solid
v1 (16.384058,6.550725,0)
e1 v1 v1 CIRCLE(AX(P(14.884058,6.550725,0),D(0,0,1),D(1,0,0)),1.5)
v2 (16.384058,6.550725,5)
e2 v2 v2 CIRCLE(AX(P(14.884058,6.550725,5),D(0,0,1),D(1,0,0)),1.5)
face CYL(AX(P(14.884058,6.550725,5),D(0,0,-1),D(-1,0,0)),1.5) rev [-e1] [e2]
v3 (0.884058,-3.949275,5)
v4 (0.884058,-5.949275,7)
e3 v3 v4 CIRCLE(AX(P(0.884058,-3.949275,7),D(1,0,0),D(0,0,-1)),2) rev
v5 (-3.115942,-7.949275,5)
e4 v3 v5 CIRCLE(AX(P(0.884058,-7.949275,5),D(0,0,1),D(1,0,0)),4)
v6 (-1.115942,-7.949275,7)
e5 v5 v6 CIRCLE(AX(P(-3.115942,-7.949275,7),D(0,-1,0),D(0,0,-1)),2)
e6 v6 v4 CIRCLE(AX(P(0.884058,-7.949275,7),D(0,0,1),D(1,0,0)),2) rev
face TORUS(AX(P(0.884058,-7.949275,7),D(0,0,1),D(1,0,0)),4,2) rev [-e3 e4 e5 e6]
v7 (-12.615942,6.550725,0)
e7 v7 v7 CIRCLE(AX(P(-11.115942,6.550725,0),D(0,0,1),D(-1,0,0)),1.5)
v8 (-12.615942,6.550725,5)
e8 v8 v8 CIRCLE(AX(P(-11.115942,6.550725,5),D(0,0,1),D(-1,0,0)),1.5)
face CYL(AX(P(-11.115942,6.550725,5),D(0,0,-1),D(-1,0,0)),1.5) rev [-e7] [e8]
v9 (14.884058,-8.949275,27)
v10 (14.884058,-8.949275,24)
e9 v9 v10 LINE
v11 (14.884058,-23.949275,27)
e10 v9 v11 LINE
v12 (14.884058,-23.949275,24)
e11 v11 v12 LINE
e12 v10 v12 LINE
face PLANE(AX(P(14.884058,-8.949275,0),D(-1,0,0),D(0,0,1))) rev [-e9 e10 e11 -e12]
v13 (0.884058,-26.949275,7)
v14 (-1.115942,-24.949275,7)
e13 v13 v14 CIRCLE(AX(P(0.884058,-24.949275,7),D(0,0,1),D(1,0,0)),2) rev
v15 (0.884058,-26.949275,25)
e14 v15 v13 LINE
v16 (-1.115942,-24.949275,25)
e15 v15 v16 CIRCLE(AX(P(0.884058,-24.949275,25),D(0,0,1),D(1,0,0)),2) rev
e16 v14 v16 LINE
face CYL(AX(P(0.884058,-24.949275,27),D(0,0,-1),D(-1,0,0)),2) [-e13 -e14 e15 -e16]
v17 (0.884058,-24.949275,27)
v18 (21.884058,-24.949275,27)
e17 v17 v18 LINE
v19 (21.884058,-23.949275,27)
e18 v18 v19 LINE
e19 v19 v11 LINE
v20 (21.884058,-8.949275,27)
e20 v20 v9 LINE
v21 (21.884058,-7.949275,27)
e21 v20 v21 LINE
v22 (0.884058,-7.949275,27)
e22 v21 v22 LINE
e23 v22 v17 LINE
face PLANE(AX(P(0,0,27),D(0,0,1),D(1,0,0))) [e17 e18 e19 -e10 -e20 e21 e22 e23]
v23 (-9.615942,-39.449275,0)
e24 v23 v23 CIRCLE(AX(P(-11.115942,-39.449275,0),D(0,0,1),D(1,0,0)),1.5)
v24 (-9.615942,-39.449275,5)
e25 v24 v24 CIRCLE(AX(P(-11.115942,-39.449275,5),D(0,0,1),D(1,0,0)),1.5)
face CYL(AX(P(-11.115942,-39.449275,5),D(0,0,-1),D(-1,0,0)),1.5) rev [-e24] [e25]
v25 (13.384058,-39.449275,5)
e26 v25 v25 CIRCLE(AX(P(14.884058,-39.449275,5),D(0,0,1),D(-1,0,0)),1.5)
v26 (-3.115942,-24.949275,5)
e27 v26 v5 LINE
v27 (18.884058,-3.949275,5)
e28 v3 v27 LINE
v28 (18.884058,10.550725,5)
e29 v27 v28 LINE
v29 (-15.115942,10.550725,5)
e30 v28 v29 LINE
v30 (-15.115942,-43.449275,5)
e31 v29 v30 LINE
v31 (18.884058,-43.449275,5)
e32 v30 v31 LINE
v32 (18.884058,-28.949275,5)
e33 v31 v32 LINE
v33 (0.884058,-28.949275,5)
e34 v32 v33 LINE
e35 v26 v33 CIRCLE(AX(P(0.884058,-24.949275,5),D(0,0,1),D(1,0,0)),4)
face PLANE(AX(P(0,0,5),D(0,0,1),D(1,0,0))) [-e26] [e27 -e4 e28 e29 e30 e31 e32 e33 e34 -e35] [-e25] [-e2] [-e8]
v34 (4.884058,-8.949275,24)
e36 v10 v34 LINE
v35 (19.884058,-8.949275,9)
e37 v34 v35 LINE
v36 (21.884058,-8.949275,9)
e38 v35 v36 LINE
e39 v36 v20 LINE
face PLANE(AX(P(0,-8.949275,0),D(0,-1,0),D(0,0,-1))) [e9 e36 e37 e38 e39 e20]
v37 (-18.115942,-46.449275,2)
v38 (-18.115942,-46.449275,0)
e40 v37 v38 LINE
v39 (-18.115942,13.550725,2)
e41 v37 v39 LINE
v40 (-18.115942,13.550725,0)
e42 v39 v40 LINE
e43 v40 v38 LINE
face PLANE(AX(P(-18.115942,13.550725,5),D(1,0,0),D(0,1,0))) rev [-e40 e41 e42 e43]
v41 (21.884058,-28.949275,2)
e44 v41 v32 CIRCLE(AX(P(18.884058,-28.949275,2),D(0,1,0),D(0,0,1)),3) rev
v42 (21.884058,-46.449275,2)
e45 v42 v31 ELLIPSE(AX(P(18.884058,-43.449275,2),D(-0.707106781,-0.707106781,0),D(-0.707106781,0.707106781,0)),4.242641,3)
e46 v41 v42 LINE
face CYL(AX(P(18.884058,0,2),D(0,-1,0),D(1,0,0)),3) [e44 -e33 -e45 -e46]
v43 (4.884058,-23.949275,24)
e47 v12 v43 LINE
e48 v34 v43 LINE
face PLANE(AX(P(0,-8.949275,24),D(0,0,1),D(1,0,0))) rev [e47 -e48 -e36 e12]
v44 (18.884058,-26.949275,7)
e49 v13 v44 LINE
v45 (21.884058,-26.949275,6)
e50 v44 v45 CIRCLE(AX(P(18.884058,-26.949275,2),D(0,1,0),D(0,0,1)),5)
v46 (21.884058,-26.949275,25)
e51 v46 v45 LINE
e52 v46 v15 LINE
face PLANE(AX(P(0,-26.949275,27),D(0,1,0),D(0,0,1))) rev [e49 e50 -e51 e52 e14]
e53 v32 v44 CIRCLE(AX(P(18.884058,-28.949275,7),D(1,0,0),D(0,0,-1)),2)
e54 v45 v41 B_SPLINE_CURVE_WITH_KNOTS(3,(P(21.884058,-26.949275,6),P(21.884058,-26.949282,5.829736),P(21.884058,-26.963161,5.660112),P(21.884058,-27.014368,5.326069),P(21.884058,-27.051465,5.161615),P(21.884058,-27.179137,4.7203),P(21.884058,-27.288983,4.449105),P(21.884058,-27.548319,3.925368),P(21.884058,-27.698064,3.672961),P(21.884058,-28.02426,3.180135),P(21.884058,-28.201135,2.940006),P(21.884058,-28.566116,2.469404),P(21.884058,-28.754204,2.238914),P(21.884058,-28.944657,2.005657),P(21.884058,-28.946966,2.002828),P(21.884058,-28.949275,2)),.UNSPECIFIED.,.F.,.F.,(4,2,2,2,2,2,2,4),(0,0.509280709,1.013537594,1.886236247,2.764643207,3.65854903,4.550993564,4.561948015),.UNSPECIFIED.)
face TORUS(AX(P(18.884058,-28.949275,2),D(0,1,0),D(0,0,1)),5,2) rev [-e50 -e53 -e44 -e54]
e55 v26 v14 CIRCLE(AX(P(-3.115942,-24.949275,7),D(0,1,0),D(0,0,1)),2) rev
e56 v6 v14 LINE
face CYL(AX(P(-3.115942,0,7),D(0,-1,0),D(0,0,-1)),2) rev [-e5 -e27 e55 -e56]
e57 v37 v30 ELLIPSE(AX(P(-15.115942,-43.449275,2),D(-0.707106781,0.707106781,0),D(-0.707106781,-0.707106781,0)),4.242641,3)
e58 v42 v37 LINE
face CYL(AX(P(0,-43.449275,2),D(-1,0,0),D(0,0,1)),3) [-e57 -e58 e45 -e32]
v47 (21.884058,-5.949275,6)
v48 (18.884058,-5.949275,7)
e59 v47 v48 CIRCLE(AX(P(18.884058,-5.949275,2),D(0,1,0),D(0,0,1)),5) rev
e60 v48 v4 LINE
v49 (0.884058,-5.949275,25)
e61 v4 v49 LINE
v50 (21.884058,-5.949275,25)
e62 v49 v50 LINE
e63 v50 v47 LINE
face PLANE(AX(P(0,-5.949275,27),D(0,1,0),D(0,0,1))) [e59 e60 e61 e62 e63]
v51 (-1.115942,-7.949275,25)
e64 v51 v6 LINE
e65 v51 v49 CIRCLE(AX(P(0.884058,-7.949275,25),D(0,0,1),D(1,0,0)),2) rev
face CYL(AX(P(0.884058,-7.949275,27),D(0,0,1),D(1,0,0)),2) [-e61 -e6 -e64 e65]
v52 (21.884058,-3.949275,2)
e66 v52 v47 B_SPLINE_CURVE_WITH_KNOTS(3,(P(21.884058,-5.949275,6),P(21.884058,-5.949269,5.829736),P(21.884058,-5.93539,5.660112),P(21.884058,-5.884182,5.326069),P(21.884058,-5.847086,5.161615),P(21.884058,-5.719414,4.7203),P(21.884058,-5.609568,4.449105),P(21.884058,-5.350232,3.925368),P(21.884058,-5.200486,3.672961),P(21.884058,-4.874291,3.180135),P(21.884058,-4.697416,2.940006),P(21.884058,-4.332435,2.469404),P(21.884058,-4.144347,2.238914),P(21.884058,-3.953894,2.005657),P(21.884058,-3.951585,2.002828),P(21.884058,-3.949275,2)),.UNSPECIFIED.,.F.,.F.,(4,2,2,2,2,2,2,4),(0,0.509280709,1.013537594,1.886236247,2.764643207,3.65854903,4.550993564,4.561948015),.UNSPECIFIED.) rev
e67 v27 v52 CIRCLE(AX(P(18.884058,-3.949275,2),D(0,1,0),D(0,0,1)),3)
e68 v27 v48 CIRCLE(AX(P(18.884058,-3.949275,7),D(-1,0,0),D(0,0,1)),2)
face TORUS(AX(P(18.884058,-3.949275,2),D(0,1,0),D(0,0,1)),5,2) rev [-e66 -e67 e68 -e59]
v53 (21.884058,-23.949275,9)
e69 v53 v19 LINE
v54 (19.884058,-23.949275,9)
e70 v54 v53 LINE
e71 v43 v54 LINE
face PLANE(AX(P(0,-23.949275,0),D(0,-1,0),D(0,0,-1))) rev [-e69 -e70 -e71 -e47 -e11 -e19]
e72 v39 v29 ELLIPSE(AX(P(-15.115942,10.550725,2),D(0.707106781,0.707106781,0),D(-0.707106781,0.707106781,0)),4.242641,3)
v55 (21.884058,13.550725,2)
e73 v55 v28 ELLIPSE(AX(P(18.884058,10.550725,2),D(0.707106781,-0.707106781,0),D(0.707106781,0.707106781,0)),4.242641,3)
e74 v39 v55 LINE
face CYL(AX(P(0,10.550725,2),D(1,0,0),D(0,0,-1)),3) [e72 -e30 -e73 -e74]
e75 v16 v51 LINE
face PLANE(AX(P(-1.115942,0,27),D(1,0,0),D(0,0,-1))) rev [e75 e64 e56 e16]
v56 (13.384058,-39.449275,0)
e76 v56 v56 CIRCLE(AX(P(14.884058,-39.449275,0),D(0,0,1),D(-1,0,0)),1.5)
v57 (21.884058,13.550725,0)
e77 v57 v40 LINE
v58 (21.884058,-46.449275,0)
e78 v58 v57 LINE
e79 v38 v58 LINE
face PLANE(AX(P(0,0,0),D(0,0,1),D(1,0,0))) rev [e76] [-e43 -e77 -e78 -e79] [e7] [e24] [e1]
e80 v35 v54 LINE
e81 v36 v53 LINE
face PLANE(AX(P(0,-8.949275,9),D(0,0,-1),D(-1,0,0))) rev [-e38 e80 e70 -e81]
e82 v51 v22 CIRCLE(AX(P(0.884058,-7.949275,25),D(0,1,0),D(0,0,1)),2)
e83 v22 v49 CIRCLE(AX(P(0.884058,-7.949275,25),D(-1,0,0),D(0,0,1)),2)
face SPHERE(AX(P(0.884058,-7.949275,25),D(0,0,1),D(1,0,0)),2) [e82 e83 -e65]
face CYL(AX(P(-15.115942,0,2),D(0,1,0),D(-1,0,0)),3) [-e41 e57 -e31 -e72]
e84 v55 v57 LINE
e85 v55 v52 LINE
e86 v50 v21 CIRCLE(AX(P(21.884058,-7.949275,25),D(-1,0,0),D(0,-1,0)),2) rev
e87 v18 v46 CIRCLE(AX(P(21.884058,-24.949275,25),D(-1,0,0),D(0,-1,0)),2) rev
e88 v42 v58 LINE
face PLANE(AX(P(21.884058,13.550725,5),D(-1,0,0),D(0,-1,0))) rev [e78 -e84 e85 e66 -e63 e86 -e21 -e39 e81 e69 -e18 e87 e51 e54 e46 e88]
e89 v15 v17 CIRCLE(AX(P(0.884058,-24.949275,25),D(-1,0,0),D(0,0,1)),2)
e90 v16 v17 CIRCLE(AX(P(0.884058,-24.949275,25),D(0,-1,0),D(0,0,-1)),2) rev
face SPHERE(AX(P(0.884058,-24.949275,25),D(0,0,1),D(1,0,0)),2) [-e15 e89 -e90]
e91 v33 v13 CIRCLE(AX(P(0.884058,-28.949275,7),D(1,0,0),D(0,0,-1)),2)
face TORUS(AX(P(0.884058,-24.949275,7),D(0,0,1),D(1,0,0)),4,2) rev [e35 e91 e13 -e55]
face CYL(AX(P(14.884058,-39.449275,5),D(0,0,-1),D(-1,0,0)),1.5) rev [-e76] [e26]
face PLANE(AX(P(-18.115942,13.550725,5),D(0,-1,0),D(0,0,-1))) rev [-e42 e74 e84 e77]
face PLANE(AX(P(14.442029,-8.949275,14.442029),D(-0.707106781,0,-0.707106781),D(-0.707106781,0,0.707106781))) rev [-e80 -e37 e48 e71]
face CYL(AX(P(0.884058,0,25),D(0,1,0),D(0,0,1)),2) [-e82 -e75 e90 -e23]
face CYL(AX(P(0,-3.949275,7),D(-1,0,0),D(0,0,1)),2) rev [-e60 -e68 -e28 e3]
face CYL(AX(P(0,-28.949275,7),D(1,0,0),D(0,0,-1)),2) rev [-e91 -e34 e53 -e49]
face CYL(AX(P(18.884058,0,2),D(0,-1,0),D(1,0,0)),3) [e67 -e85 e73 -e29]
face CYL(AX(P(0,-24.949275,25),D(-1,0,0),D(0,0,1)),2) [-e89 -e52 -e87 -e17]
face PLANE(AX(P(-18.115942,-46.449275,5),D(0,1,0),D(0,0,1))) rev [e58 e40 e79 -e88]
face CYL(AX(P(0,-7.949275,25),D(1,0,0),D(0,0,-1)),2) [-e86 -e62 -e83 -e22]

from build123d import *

# Parameters (mm, degrees)
SKETCH1_W           = 40
SKETCH1_H           = 60
SKETCH1_R           = 1.5
BOSS_EXTRUDE1_DEPTH = 5
SKETCH3_W           = 23
SKETCH3_H           = 21
BOSS_EXTRUDE2_DEPTH = 22
CUT_EXTRUDE1_START  = -3
SKETCH4_W           = 2
SKETCH4_H           = 15
CUT_EXTRUDE1_DEPTH  = 15
FILLET1_R           = 3
FILLET2_R           = 2


with BuildPart() as part:
    # Sketch1 → Boss-Extrude1 (new body)
    with BuildSketch(Plane.XY):
        with Locations((1.884057971, -16.449275362)):
            Rectangle(SKETCH1_W, SKETCH1_H)
        with Locations((14.884057971, 6.550724638)):
            Circle(SKETCH1_R, mode=Mode.SUBTRACT)
        with Locations(Location((14.884057971, -39.449275362, 0), (0, 0, 180))):
            Circle(SKETCH1_R, mode=Mode.SUBTRACT)
        with Locations((-11.115942029, -39.449275362)):
            Circle(SKETCH1_R, mode=Mode.SUBTRACT)
        with Locations(Location((-11.115942029, 6.550724638, 0), (0, 0, 180))):
            Circle(SKETCH1_R, mode=Mode.SUBTRACT)
    extrude(amount=BOSS_EXTRUDE1_DEPTH)

    # Sketch3 → Boss-Extrude2 (add)
    with BuildSketch(Plane.XY.offset(5)):
        with Locations((10.384057971, -16.449275362)):
            Rectangle(SKETCH3_W, SKETCH3_H)
    extrude(amount=BOSS_EXTRUDE2_DEPTH)

    # Sketch4 → Cut-Extrude1 (cut)
    with BuildSketch(Plane.XZ.offset(26.949275362).offset(CUT_EXTRUDE1_START)):
        with Locations((20.884057971, 16.5)):
            Rectangle(SKETCH4_W, SKETCH4_H)
        Polygon((14.884057971, 24), (14.884057971, 14), (19.884057971, 9), (19.884057971, 24), align=None)
        Polygon((14.884057971, 27), (14.884057971, 24), (19.884057971, 24), (21.884057971, 24), (21.884057971, 27), align=None)
        Polygon((14.884057971, 24), (4.884057971, 24), (14.884057971, 14), align=None)
    extrude(amount=-CUT_EXTRUDE1_DEPTH, mode=Mode.SUBTRACT)

    # Fillet1
    fillet1_edges = [part.edges().sort_by_distance(p)[0] for p in [
        (21.884057971, -36.699275362, 5),
        (1.884057971, 13.550724638, 5),
        (21.884057971, 3.800724638, 5),
        (-18.115942029, -16.449275362, 5),
        (1.884057971, -46.449275362, 5),
    ]]
    fillet(fillet1_edges, radius=FILLET1_R)

    # Fillet2
    # the kernel refuses this fillet: 2 mm, written as the material it takes off along each edge
    with BuildSketch(Plane(origin=(0.884057971, -7.949275362, 25), x_dir=(-1, 0, 0), z_dir=(0, 0, 1))) as fillet2_piece_1_section:
        Polygon((0, 0), (FILLET2_R * 1.02, 0), (FILLET2_R * 1.02, -FILLET2_R * 1.02), (0, -FILLET2_R * 1.02), align=None)
    fillet2_piece_1 = extrude(amount=FILLET2_R * 1.02, mode=Mode.PRIVATE)
    fillet2_piece_1 = fillet2_piece_1 - Plane(origin=(0.884057971, -7.949275362, 25), x_dir=(0.7071067811865475, -0.7071067811865475, 0), z_dir=(0, 0, 1)) * Sphere(FILLET2_R, mode=Mode.PRIVATE)
    add(fillet2_piece_1, mode=Mode.SUBTRACT)
    with BuildSketch(Plane(origin=(0.884057971, -24.949275362, 25), x_dir=(-1, 0, 0), z_dir=(0, 0, 1))) as fillet2_piece_2_section:
        Polygon((0, 0), (FILLET2_R * 1.02, 0), (FILLET2_R * 1.02, FILLET2_R * 1.02), (0, FILLET2_R * 1.02), align=None)
    fillet2_piece_2 = extrude(amount=FILLET2_R * 1.02, mode=Mode.PRIVATE)
    fillet2_piece_2 = fillet2_piece_2 - Plane(origin=(0.884057971, -24.949275362, 25), x_dir=(0.7071067811865475, 0.7071067811865475, 0), z_dir=(0, 0, 1)) * Sphere(FILLET2_R, mode=Mode.PRIVATE)
    add(fillet2_piece_2, mode=Mode.SUBTRACT)
    with BuildSketch(Plane(origin=(-1.115942029, -5.949275362, 5), x_dir=(0, -1, 0), z_dir=(0, 0, 1))) as fillet2_piece_3:
        with BuildLine():
            CenterArc((FILLET2_R, FILLET2_R), FILLET2_R, 180, 90)
            Line((0, FILLET2_R), (0, 0))
            Line((0, 0), (FILLET2_R, 0))
        make_face()
    extrude(amount=20, mode=Mode.SUBTRACT)
    with BuildSketch(Plane(origin=(-1.115942029, -26.949275362, 5), x_dir=(0, 1, 0), z_dir=(0, 0, 1))) as fillet2_piece_4:
        with BuildLine():
            CenterArc((FILLET2_R, -FILLET2_R), FILLET2_R, 90, 90)
            Line((0, -FILLET2_R), (0, 0))
            Line((0, 0), (FILLET2_R, 0))
        make_face()
    extrude(amount=20, mode=Mode.SUBTRACT)
    with BuildSketch(Plane(origin=(0.884057971, -5.949275362, 27), x_dir=(0, -1, 0), z_dir=(1, 0, 0))) as fillet2_piece_5:
        with BuildLine():
            CenterArc((FILLET2_R, FILLET2_R), FILLET2_R, 180, 90)
            Line((0, FILLET2_R), (0, 0))
            Line((0, 0), (FILLET2_R, 0))
        make_face()
    extrude(amount=26, mode=Mode.SUBTRACT)
    with BuildSketch(Plane(origin=(-1.115942029, -24.949275362, 27), x_dir=(0, 0, -1), z_dir=(0, 1, 0))) as fillet2_piece_6:
        with BuildLine():
            CenterArc((FILLET2_R, -FILLET2_R), FILLET2_R, 90, 90)
            Line((0, -FILLET2_R), (0, 0))
            Line((0, 0), (FILLET2_R, 0))
        make_face()
    extrude(amount=17, mode=Mode.SUBTRACT)
    with BuildSketch(Plane(origin=(26.884057971, -26.949275362, 27), x_dir=(0, 0, -1), z_dir=(-1, 0, 0))) as fillet2_piece_7:
        with BuildLine():
            CenterArc((FILLET2_R, -FILLET2_R), FILLET2_R, 90, 90)
            Line((0, -FILLET2_R), (0, 0))
            Line((0, 0), (FILLET2_R, 0))
        make_face()
    extrude(amount=26, mode=Mode.SUBTRACT)
    # the kernel refuses this fillet: 2 mm, written as the material it adds along each edge
    with BuildSketch(Plane(origin=(-1.115942029, -24.949275362, 5), x_dir=(-1, 0, 0), z_dir=(0, 1, 0))) as fillet2_2_piece_1:
        with BuildLine():
            CenterArc((FILLET2_R, FILLET2_R), FILLET2_R, 180, 90)
            Line((0, FILLET2_R), (0, 0))
            Line((0, 0), (FILLET2_R, 0))
        make_face()
    extrude(amount=17)
    with BuildSketch(Plane(origin=(18.884057971, -26.949275362, 5), x_dir=(0, -1, 0), z_dir=(-1, 0, 0)), Plane(origin=(0.884057971, -5.949275362, 5), x_dir=(0, 1, 0), z_dir=(1, 0, 0))) as fillet2_2_piece_2:
        with BuildLine():
            CenterArc((FILLET2_R, FILLET2_R), FILLET2_R, 180, 90)
            Line((0, FILLET2_R), (0, 0))
            Line((0, 0), (FILLET2_R, 0))
        make_face()
    extrude(amount=18)
    with BuildSketch(Plane(origin=(18.884057971, -5.949275362, 2), x_dir=(-0.09638996566753259, 0, -0.9953436464450918), z_dir=(-0.9953436464450918, 0, 0.09638996566753259))) as fillet2_2_piece_3_section:
        with BuildLine():
            CenterArc((3 + FILLET2_R, -FILLET2_R), FILLET2_R, 90, 90)
            Line((3 + FILLET2_R, 0), (3, 0))
            Line((3, 0), (3, -FILLET2_R))
        make_face()
    fillet2_2_piece_3 = revolve(axis=Axis((18.884057971, -5.949275362, 2), (0, -1, 0)), revolution_arc=185.531326158, mode=Mode.PRIVATE)
    fillet2_2_piece_3 = split(fillet2_2_piece_3, bisect_by=Plane(origin=(21.104944702, -5.375674968, 0), z_dir=(0, 0, 1)), keep=Keep.TOP, mode=Mode.PRIVATE)
    fillet2_2_piece_3 = split(fillet2_2_piece_3, bisect_by=Plane(origin=(21.884057971, -5.375674968, 4.220886685), z_dir=(-1, 0, 0)), keep=Keep.TOP, mode=Mode.PRIVATE)
    add(fillet2_2_piece_3)
    with BuildSketch(Plane(origin=(18.884057971, -26.949275362, 2), x_dir=(-0.09638996566753259, 0, -0.9953436464450918), z_dir=(-0.9953436464450918, 0, 0.09638996566753259))) as fillet2_2_piece_4_section:
        with BuildLine():
            CenterArc((3 + FILLET2_R, FILLET2_R), FILLET2_R, 180, 90)
            Line((3 + FILLET2_R, 0), (3, 0))
            Line((3, 0), (3, FILLET2_R))
        make_face()
    fillet2_2_piece_4 = revolve(axis=Axis((18.884057971, -26.949275362, 2), (0, -1, 0)), revolution_arc=185.531326158, mode=Mode.PRIVATE)
    fillet2_2_piece_4 = split(fillet2_2_piece_4, bisect_by=Plane(origin=(21.104944699, -27.522875755, 0), z_dir=(0, 0, 1)), keep=Keep.TOP, mode=Mode.PRIVATE)
    fillet2_2_piece_4 = split(fillet2_2_piece_4, bisect_by=Plane(origin=(21.884057971, -27.522875755, 4.220886633), z_dir=(-1, 0, 0)), keep=Keep.TOP, mode=Mode.PRIVATE)
    add(fillet2_2_piece_4)
    with BuildSketch(Plane(origin=(0.884057971, -7.949275362, 5), x_dir=(-1, 0, 0), z_dir=(0, -1, 0))) as fillet2_2_piece_5:
        with BuildLine():
            CenterArc((2 + FILLET2_R, -FILLET2_R), FILLET2_R, 90, 90)
            Line((2, -FILLET2_R), (2, 0))
            Line((2, 0), (2 + FILLET2_R, 0))
        make_face()
    revolve(axis=Axis((0.884057971, -7.949275362, 5), (0, 0, -1)), revolution_arc=90)
    with BuildSketch(Plane(origin=(0.884057971, -24.949275362, 5), x_dir=(-1, 0, 0), z_dir=(0, 1, 0))) as fillet2_2_piece_6:
        with BuildLine():
            CenterArc((2 + FILLET2_R, FILLET2_R), FILLET2_R, 180, 90)
            Line((2, FILLET2_R), (2, 0))
            Line((2, 0), (2 + FILLET2_R, 0))
        make_face()
    revolve(axis=Axis((0.884057971, -24.949275362, 5), (0, 0, 1)), revolution_arc=90)


solid = part.part
